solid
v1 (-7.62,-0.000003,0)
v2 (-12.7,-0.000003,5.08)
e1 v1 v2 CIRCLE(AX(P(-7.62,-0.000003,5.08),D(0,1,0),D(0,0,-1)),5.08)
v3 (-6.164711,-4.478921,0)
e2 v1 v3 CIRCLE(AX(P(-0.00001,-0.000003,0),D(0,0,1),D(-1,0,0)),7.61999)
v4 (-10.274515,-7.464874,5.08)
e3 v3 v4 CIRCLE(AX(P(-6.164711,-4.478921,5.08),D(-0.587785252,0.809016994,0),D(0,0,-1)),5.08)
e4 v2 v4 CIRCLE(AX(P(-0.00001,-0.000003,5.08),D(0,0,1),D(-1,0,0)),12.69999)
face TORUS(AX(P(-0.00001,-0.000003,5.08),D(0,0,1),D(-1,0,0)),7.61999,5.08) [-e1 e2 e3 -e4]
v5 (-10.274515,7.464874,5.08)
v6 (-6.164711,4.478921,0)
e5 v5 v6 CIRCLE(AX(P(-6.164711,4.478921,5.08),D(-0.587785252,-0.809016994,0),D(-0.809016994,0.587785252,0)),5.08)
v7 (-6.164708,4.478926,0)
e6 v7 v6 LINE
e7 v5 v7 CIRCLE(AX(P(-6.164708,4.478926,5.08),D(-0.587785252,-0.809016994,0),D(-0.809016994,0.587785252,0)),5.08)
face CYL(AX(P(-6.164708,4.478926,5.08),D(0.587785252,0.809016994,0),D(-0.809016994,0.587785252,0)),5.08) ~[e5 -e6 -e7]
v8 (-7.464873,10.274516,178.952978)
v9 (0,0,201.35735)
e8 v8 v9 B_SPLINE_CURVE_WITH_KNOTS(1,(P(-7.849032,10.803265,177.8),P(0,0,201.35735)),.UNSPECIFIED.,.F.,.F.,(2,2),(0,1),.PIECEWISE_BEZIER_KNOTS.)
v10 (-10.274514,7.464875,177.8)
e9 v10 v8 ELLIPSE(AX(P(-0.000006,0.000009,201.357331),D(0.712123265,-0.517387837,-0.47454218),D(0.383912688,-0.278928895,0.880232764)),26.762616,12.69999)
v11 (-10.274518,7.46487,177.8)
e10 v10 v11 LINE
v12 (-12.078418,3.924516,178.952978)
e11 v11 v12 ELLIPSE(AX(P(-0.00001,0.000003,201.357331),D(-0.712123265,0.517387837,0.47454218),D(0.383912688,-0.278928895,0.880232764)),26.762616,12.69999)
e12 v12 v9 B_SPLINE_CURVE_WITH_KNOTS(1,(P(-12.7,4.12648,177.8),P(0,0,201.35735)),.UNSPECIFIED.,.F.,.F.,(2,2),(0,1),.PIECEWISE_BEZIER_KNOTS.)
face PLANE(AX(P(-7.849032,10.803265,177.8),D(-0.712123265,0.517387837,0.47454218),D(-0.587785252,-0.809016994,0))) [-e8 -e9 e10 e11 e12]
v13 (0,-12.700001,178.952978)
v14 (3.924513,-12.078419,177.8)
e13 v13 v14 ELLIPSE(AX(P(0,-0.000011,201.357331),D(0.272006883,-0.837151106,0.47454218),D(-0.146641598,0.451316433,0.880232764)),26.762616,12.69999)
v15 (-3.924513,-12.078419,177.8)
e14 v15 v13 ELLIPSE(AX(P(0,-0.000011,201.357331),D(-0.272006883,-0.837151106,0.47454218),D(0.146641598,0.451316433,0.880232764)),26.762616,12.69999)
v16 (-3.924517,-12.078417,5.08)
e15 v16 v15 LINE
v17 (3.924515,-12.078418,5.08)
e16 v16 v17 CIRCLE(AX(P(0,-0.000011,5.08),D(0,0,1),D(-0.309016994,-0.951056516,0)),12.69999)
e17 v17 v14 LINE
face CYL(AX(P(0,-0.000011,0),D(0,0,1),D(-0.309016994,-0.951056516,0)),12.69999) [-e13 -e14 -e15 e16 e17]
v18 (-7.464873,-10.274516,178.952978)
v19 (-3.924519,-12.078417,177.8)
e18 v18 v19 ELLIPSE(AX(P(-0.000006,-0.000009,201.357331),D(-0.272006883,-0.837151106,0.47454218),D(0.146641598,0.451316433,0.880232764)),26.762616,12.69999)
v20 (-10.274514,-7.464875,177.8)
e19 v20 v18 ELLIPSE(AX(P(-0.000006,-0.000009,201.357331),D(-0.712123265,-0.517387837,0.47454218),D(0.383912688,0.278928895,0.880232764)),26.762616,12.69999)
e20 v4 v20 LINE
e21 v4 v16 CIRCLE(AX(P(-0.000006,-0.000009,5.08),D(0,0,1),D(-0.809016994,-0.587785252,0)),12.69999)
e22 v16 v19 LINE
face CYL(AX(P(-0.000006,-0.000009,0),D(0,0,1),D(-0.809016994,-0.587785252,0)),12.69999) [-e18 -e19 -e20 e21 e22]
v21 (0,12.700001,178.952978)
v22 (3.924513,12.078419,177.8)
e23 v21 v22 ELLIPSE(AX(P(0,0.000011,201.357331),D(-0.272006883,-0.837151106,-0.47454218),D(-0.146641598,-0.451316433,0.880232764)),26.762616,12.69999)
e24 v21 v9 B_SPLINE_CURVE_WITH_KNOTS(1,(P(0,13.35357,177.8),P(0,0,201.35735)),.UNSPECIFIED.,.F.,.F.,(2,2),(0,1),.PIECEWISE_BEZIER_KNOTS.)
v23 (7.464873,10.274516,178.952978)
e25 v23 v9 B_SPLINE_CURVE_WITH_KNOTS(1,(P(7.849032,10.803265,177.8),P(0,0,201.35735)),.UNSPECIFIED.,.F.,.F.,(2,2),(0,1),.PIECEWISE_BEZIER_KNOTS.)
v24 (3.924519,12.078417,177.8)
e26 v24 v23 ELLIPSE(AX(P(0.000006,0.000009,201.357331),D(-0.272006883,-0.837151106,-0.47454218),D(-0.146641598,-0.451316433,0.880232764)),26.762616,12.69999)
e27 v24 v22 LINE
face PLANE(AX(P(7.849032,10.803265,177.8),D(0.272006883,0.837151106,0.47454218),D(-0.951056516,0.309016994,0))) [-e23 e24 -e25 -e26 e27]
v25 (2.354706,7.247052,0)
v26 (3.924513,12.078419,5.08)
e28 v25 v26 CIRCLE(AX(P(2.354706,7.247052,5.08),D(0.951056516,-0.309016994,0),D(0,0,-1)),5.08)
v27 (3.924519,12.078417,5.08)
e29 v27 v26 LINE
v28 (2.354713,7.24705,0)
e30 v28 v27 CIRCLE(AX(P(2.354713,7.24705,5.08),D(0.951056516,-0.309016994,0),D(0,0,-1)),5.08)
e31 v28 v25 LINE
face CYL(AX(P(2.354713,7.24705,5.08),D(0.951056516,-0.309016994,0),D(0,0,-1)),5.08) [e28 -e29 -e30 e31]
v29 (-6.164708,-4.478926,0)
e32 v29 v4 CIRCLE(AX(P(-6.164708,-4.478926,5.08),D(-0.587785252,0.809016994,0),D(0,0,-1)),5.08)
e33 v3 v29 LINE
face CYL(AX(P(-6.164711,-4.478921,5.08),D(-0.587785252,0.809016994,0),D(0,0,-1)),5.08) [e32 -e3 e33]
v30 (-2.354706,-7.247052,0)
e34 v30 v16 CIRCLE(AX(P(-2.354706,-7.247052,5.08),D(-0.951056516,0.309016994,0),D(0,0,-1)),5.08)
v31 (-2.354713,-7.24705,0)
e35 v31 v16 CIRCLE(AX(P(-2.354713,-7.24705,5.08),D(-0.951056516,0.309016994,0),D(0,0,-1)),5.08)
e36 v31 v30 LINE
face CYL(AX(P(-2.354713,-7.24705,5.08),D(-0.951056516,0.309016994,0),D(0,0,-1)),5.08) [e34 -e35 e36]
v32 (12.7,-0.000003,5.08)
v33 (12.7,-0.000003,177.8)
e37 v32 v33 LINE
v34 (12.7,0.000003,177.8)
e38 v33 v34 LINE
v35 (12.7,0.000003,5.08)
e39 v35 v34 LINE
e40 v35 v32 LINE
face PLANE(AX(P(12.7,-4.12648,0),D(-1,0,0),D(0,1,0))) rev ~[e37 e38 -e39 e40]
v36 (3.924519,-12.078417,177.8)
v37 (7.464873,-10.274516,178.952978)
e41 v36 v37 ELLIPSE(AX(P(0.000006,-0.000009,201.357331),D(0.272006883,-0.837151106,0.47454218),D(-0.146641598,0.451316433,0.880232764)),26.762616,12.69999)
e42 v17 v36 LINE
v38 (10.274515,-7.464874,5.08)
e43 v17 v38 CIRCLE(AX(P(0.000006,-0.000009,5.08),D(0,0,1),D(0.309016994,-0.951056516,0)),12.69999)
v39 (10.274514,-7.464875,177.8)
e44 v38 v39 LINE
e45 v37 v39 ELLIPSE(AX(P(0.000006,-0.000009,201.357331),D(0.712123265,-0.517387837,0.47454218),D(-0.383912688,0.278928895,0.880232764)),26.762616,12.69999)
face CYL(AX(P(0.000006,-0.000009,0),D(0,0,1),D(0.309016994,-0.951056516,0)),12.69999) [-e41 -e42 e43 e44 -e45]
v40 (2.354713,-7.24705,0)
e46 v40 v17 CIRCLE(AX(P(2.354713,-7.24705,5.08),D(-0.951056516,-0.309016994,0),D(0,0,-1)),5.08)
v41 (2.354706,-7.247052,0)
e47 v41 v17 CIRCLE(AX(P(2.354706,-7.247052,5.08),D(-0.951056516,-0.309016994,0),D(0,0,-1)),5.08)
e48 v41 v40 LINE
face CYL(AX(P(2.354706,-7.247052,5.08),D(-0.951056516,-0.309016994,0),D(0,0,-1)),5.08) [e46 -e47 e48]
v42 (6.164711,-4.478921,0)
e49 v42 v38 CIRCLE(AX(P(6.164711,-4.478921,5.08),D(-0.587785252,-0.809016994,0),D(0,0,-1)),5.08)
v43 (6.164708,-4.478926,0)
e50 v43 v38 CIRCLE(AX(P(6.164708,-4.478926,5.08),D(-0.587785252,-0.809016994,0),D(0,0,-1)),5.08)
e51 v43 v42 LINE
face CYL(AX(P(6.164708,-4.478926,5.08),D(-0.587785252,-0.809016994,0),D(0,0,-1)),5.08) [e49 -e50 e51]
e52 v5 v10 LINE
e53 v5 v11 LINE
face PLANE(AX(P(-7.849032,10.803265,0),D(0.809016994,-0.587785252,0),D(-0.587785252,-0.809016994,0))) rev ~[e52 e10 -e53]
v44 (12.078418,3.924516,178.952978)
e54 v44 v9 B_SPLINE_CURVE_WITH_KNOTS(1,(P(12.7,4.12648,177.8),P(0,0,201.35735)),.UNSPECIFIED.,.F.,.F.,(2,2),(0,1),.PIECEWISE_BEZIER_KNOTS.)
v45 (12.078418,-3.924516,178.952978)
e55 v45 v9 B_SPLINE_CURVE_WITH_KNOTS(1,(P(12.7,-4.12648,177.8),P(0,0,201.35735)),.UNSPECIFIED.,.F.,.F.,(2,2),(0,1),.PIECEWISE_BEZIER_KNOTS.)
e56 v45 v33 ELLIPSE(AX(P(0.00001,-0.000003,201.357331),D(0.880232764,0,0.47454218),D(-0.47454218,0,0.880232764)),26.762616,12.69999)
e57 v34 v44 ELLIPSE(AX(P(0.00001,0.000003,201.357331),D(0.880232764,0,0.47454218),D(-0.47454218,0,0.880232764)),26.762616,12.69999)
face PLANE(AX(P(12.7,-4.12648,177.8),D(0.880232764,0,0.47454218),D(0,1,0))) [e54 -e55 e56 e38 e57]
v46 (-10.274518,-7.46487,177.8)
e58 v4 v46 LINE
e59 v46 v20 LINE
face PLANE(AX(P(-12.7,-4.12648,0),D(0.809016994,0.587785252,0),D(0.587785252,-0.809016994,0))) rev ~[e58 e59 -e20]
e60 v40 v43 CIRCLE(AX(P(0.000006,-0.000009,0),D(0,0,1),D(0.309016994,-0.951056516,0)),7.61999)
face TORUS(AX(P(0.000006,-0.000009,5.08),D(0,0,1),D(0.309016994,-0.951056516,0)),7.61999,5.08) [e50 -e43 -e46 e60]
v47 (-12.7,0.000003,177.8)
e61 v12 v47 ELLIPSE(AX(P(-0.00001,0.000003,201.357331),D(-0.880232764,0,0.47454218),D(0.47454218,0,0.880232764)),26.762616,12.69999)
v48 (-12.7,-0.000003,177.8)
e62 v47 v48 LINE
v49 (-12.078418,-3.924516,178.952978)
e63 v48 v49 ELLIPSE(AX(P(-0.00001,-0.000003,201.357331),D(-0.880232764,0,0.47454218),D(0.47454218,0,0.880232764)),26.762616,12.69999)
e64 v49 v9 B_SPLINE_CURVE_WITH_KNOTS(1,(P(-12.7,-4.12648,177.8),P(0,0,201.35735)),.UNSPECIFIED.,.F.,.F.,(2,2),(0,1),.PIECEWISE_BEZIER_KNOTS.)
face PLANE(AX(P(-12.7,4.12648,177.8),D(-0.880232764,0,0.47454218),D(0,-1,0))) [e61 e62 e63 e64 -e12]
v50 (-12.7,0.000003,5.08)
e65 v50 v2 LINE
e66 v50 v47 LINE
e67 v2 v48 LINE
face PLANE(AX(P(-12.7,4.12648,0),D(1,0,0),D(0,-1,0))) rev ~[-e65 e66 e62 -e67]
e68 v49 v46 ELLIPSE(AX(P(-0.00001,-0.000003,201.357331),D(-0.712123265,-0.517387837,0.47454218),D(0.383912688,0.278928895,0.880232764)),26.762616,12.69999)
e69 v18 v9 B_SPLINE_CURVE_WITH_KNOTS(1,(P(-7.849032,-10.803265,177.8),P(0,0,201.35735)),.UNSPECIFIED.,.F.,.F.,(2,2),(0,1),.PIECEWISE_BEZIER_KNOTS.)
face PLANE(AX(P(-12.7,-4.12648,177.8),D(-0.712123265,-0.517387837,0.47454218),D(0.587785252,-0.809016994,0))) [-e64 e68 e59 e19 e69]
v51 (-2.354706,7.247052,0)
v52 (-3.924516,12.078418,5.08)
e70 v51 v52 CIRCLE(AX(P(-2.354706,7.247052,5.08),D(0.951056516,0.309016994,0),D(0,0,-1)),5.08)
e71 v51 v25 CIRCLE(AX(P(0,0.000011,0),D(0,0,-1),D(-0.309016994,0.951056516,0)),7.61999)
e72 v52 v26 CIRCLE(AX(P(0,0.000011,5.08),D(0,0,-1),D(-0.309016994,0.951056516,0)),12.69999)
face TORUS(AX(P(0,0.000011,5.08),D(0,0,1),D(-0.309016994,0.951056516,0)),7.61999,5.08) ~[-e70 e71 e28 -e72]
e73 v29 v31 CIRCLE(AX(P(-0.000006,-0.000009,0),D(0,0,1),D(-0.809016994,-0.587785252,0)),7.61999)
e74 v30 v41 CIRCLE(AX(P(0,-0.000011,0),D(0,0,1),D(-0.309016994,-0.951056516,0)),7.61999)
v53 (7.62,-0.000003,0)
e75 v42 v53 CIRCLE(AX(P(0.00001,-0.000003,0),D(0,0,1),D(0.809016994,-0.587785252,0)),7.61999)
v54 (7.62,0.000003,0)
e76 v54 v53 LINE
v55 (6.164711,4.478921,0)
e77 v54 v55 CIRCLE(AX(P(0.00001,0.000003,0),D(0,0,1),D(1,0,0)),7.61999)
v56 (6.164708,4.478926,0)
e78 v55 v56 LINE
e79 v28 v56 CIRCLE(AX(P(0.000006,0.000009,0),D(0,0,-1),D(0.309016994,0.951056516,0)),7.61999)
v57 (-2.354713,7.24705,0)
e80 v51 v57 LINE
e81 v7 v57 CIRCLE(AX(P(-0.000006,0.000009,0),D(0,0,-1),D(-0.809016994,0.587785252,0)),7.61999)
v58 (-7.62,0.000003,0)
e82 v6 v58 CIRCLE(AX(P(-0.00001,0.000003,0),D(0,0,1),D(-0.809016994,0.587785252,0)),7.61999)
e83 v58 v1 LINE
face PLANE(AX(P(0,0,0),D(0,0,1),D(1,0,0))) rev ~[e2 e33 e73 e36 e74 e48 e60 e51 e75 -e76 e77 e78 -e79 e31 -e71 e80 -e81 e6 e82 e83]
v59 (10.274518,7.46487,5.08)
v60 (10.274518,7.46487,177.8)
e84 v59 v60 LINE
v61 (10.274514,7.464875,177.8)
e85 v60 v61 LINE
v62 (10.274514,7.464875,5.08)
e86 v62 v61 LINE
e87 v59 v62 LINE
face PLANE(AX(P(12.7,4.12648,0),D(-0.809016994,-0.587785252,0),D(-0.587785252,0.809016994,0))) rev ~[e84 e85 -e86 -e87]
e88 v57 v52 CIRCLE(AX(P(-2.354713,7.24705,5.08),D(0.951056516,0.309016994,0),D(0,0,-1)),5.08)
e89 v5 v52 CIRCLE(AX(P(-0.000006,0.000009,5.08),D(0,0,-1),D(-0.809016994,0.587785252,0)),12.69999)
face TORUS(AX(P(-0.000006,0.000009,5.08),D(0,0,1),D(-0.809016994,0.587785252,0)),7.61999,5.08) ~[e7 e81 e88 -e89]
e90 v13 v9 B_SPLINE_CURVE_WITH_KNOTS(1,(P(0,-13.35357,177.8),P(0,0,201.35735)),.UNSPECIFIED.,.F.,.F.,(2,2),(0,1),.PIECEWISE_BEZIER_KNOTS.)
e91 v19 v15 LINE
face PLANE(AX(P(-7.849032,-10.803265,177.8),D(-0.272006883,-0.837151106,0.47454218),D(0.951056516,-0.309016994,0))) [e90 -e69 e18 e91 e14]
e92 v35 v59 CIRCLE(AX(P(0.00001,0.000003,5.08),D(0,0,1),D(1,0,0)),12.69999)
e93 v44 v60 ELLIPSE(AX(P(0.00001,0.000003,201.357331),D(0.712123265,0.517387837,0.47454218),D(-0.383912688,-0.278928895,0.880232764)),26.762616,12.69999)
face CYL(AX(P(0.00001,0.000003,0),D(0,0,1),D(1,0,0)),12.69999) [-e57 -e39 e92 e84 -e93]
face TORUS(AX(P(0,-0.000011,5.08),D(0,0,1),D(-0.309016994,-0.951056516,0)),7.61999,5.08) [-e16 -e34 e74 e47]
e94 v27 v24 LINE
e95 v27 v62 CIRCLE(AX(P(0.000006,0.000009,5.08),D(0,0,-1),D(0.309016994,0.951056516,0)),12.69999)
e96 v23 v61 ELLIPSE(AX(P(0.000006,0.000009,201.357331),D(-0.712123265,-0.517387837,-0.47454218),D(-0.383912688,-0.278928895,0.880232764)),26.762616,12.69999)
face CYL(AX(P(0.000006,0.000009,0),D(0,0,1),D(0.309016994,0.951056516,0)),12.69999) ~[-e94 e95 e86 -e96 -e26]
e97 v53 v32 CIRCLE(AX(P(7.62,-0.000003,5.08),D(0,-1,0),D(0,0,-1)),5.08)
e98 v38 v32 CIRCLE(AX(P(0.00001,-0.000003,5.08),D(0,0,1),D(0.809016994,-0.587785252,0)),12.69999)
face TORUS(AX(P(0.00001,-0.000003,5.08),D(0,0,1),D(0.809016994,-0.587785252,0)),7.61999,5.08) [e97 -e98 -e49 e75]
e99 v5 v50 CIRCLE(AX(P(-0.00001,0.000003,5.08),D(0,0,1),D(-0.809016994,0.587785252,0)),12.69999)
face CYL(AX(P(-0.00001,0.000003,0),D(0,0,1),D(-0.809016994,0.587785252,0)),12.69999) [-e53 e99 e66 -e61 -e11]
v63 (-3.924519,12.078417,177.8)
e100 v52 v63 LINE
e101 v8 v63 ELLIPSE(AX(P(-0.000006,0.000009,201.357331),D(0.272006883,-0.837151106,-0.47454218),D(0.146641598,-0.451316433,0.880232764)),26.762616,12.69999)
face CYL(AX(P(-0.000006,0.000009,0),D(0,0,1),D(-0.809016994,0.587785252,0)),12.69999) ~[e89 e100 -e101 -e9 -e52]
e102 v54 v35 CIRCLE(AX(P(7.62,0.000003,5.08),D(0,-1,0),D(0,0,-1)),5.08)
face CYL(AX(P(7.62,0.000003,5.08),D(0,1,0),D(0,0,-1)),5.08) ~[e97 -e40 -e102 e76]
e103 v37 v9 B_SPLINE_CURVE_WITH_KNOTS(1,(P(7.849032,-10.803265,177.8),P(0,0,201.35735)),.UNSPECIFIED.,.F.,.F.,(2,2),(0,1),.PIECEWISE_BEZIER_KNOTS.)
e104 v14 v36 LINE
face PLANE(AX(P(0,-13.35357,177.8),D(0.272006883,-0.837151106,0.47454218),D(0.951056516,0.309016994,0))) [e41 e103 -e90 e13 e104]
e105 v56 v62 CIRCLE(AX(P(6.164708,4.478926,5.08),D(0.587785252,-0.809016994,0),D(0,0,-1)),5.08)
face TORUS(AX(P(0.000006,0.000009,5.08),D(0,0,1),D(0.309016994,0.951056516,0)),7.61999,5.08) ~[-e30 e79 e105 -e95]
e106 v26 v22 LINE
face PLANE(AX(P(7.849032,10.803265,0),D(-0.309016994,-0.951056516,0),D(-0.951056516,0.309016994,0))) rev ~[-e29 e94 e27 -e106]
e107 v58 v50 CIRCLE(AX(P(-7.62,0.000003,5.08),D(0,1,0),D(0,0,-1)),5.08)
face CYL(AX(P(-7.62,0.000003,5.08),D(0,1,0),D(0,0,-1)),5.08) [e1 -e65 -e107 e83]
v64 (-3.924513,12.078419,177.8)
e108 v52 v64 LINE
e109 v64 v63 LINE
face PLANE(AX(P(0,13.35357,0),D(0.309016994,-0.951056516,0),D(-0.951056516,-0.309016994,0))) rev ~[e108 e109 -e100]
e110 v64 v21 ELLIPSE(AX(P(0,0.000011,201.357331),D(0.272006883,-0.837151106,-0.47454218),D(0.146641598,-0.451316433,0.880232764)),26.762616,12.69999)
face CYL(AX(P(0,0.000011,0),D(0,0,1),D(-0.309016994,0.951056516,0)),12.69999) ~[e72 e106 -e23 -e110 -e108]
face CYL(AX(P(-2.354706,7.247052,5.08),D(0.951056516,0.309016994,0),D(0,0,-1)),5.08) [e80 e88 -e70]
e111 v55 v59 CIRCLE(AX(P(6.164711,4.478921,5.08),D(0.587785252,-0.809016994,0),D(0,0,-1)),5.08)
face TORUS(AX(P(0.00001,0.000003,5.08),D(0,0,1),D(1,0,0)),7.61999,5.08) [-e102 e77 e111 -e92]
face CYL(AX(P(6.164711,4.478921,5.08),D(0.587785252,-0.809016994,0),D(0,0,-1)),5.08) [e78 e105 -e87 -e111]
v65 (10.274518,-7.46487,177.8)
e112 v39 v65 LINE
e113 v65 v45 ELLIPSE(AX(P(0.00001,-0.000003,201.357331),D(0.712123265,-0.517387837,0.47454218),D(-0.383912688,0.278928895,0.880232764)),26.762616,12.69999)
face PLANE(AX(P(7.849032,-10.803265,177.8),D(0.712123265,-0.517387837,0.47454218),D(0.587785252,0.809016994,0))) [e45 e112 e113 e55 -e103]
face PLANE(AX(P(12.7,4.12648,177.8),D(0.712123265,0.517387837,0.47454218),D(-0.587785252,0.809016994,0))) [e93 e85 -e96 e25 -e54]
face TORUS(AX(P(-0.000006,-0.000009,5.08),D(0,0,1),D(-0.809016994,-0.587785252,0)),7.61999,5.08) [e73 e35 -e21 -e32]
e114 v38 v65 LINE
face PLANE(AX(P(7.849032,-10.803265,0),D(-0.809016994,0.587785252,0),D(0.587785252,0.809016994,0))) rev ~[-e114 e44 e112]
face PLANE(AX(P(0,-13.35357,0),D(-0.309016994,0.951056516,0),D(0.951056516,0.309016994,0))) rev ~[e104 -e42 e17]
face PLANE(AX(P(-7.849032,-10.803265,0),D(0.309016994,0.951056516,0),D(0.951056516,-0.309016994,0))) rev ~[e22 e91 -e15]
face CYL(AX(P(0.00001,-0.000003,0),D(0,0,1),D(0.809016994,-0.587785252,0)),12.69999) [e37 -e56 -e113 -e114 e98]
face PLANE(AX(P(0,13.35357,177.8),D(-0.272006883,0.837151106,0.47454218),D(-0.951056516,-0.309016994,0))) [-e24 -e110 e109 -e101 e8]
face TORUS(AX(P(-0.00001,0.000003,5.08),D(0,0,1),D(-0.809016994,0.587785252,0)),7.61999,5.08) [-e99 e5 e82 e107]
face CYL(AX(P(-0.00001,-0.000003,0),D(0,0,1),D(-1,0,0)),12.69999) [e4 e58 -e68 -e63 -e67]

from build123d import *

# Parameters (mm, degrees)
F1_DEPTH     = 177.8
F4_R         = 12.69999
F5_T1_DEPTH  = 6.4984e-06
F5_T3_DEPTH  = 6.4984e-06
F5_T5_DEPTH  = 6.4984e-06
F5_T7_DEPTH  = 6.4984e-06
F5_T9_DEPTH  = 6.4984e-06
F5_T11_DEPTH = 6.4984e-06
F5_T13_DEPTH = 6.4984e-06
F5_T15_DEPTH = 6.4984e-06
F5_T17_DEPTH = 6.4984e-06
F5_T20_ANGLE = 36
F5_T22_ANGLE = 36
F5_T24_ANGLE = 36
F5_T26_ANGLE = 36
F5_T28_ANGLE = 36
F5_T30_ANGLE = 36
F5_T32_ANGLE = 36
F5_T34_ANGLE = 36
F5_T36_ANGLE = 36
F5_T38_ANGLE = 36


# Not quite as in the source:
# - a fillet or chamfer that OpenCascade refuses, or shapes differently, is made with other operations: its cross-section is extruded or revolved along the edge and cut away or added
# - a fillet or chamfer is up to 0.001 mm smaller than in the source, because OpenCascade refuses the exact size


with BuildPart() as f1:
    # F0 (on Top) → F1 (new body)
    with BuildSketch(Plane.XY):
        Polygon((-12.7, 4.1264801422), (-12.7, -4.1264801422), (-7.8490316571, -10.8032652661), (0, -13.3535702478), (7.8490316571, -10.8032652661), (12.7, -4.1264801422), (12.7, 4.1264801422), (7.8490316571, 10.8032652661), (0, 13.3535702478), (-7.8490316571, 10.8032652661), align=None)
    extrude(amount=F1_DEPTH)

    # F1_face (on face) → F3 section 0
    with BuildSketch(Plane.XY.offset(177.8), mode=Mode.PRIVATE) as f3_s0:
        Polygon((-7.8490316571, 10.8032652661), (-12.7, 4.1264801422), (-12.7, -4.1264801422), (-7.8490316571, -10.8032652661), (0, -13.3535702478), (7.8490316571, -10.8032652661), (12.7, -4.1264801422), (12.7, 4.1264801422), (7.8490316571, 10.8032652661), (0, 13.3535702478), align=None)
    loft([f3_s0.sketch, Vertex(0, 0, 201.3573497534)])

    # F4 (radius 12.7 in the source; OpenCascade refuses exactly that, so slightly less here)
    f4_edges = [f1.edges().sort_by_distance(p)[0] for p in [
        (0, -13.35357, 88.9),
        (-7.849032, -10.803265, 88.9),
        (-12.7, -4.12648, 88.9),
        (-12.7, 4.12648, 88.9),
        (-7.849032, 10.803265, 88.9),
        (0, 13.35357, 88.9),
        (7.849032, 10.803265, 88.9),
        (12.7, 4.12648, 88.9),
        (12.7, -4.12648, 88.9),
        (7.849032, -10.803265, 88.9),
    ]]
    fillet(f4_edges, radius=F4_R)

    # F5: fillet of radius 5.08 on 1 edges, made by hand

    # F5_s2 → F5_t1 (cut)
    with BuildSketch(Plane.XZ.offset(-3.2492e-06)):
        with BuildLine():
            ThreePointArc((-7.62, 0), (-11.2121024484, 1.4878975516), (-12.7, 5.08))
            Line((-12.7, 5.08), (-12.7, 0))
            Line((-12.7, 0), (-7.62, 0))
        make_face()
        with BuildLine():
            ThreePointArc((7.62, 0), (11.2121024484, 1.4878975516), (12.7, 5.08))
            Line((12.7, 5.08), (12.7, 0))
            Line((12.7, 0), (7.62, 0))
        make_face()
    extrude(amount=F5_T1_DEPTH, mode=Mode.SUBTRACT)

    # F5_s4 → F5_t3 (cut)
    with BuildSketch(Plane(origin=(-1.9098e-06, 2.6287e-06, 0), x_dir=(0, 0, 1), z_dir=(0.5877852523, -0.8090169944, 0))):
        with BuildLine():
            ThreePointArc((0, 7.62), (1.4878975516, 11.2121024484), (5.08, 12.7))
            Line((5.08, 12.7), (0, 12.7))
            Line((0, 12.7), (0, 7.62))
        make_face()
    extrude(amount=F5_T3_DEPTH, mode=Mode.SUBTRACT)

    # F5_s6 → F5_t5 (cut)
    with BuildSketch(Plane(origin=(-3.0902e-06, 1.0041e-06, 0), x_dir=(0, 0, 1), z_dir=(0.9510565163, -0.3090169944, 0))):
        with BuildLine():
            ThreePointArc((0, 7.62), (1.4878975516, 11.2121024484), (5.08, 12.7))
            Line((5.08, 12.7), (0, 12.7))
            Line((0, 12.7), (0, 7.62))
        make_face()
    extrude(amount=F5_T5_DEPTH, mode=Mode.SUBTRACT)

    # F5_s8 → F5_t7 (cut)
    with BuildSketch(Plane(origin=(-3.0902e-06, -1.0041e-06, 0), x_dir=(0, 0, 1), z_dir=(0.9510565163, 0.3090169944, 0))):
        with BuildLine():
            ThreePointArc((0, 7.62), (1.4878975516, 11.2121024484), (5.08, 12.7))
            Line((5.08, 12.7), (0, 12.7))
            Line((0, 12.7), (0, 7.62))
        make_face()
    extrude(amount=F5_T7_DEPTH, mode=Mode.SUBTRACT)

    # F5_s10 → F5_t9 (cut)
    with BuildSketch(Plane(origin=(-1.9098e-06, -2.6287e-06, 0), x_dir=(0, 0, 1), z_dir=(0.5877852523, 0.8090169944, 0))):
        with BuildLine():
            ThreePointArc((0, 7.62), (1.4878975516, 11.2121024484), (5.08, 12.7))
            Line((5.08, 12.7), (0, 12.7))
            Line((0, 12.7), (0, 7.62))
        make_face()
    extrude(amount=F5_T9_DEPTH, mode=Mode.SUBTRACT)

    # F5_s12 → F5_t11 (cut)
    with BuildSketch(Plane(origin=(1.9098e-06, -2.6287e-06, 0), x_dir=(0, 0, 1), z_dir=(-0.5877852523, 0.8090169944, 0))):
        with BuildLine():
            ThreePointArc((0, 7.62), (1.4878975516, 11.2121024484), (5.08, 12.7))
            Line((5.08, 12.7), (0, 12.7))
            Line((0, 12.7), (0, 7.62))
        make_face()
    extrude(amount=F5_T11_DEPTH, mode=Mode.SUBTRACT)

    # F5_s14 → F5_t13 (cut)
    with BuildSketch(Plane(origin=(3.0902e-06, -1.0041e-06, 0), x_dir=(0, 0, 1), z_dir=(-0.9510565163, 0.3090169944, 0))):
        with BuildLine():
            ThreePointArc((0, 7.62), (1.4878975516, 11.2121024484), (5.08, 12.7))
            Line((5.08, 12.7), (0, 12.7))
            Line((0, 12.7), (0, 7.62))
        make_face()
    extrude(amount=F5_T13_DEPTH, mode=Mode.SUBTRACT)

    # F5_s16 → F5_t15 (cut)
    with BuildSketch(Plane(origin=(3.0902e-06, 1.0041e-06, 0), x_dir=(0, 0, 1), z_dir=(-0.9510565163, -0.3090169944, 0))):
        with BuildLine():
            ThreePointArc((0, 7.62), (1.4878975516, 11.2121024484), (5.08, 12.7))
            Line((5.08, 12.7), (0, 12.7))
            Line((0, 12.7), (0, 7.62))
        make_face()
    extrude(amount=F5_T15_DEPTH, mode=Mode.SUBTRACT)

    # F5_s18 → F5_t17 (cut)
    with BuildSketch(Plane(origin=(1.9098e-06, 2.6287e-06, 0), x_dir=(0, 0, 1), z_dir=(-0.5877852523, -0.8090169944, 0))):
        with BuildLine():
            ThreePointArc((5.08, 12.7), (1.4878975516, 11.2121024484), (0, 7.62))
            Line((0, 7.62), (0, 12.7))
            Line((0, 12.7), (5.08, 12.7))
        make_face()
    extrude(amount=F5_T17_DEPTH, mode=Mode.SUBTRACT)

    # F5_s19 → F5_t20 (revolve, cut)
    with BuildSketch(Plane.XZ.offset(3.2492e-06)):
        with BuildLine():
            ThreePointArc((-7.62, 0), (-11.2121024484, 1.4878975516), (-12.7, 5.08))
            Line((-12.7, 5.08), (-12.7, 0))
            Line((-12.7, 0), (-7.62, 0))
        make_face()
    revolve(axis=Axis((-1e-05, -3.2492e-06, 0), (0, 0, 1)), revolution_arc=F5_T20_ANGLE, mode=Mode.SUBTRACT)

    # F5_s21 → F5_t22 (revolve, cut)
    with BuildSketch(Plane(origin=(1.9098e-06, -2.6287e-06, 0), x_dir=(0, 0, 1), z_dir=(-0.5877852523, 0.8090169944, 0))):
        with BuildLine():
            ThreePointArc((0, -7.62), (1.4878975516, -11.2121024484), (5.08, -12.7))
            Line((5.08, -12.7), (0, -12.7))
            Line((0, -12.7), (0, -7.62))
        make_face()
    revolve(axis=Axis((-6.1803e-06, -8.5065e-06, 0), (0, 0, 1)), revolution_arc=F5_T22_ANGLE, mode=Mode.SUBTRACT)

    # F5_s23 → F5_t24 (revolve, cut)
    with BuildSketch(Plane(origin=(3.0902e-06, -1.0041e-06, 0), x_dir=(0, 0, 1), z_dir=(-0.9510565163, 0.3090169944, 0))):
        with BuildLine():
            ThreePointArc((0, -7.62), (1.4878975516, -11.2121024484), (5.08, -12.7))
            Line((5.08, -12.7), (0, -12.7))
            Line((0, -12.7), (0, -7.62))
        make_face()
    revolve(axis=Axis((0, -1.05146e-05, 0), (0, 0, 1)), revolution_arc=F5_T24_ANGLE, mode=Mode.SUBTRACT)

    # F5_s25 → F5_t26 (revolve, cut)
    with BuildSketch(Plane(origin=(3.0902e-06, 1.0041e-06, 0), x_dir=(0, 0, 1), z_dir=(-0.9510565163, -0.3090169944, 0))):
        with BuildLine():
            ThreePointArc((0, -7.62), (1.4878975516, -11.2121024484), (5.08, -12.7))
            Line((5.08, -12.7), (0, -12.7))
            Line((0, -12.7), (0, -7.62))
        make_face()
    revolve(axis=Axis((6.1803e-06, -8.5065e-06, 0), (0, 0, 1)), revolution_arc=F5_T26_ANGLE, mode=Mode.SUBTRACT)

    # F5_s27 → F5_t28 (revolve, cut)
    with BuildSketch(Plane(origin=(1.9098e-06, 2.6287e-06, 0), x_dir=(0, 0, 1), z_dir=(-0.5877852523, -0.8090169944, 0))):
        with BuildLine():
            ThreePointArc((0, -7.62), (1.4878975516, -11.2121024484), (5.08, -12.7))
            Line((5.08, -12.7), (0, -12.7))
            Line((0, -12.7), (0, -7.62))
        make_face()
    revolve(axis=Axis((1e-05, -3.2492e-06, 0), (0, 0, 1)), revolution_arc=F5_T28_ANGLE, mode=Mode.SUBTRACT)

    # F5_s29 → F5_t30 (revolve, cut)
    with BuildSketch(Plane.XZ.offset(-3.2492e-06)):
        with BuildLine():
            ThreePointArc((7.62, 0), (11.2121024484, 1.4878975516), (12.7, 5.08))
            Line((12.7, 5.08), (12.7, 0))
            Line((12.7, 0), (7.62, 0))
        make_face()
    revolve(axis=Axis((1e-05, 3.2492e-06, 0), (0, 0, 1)), revolution_arc=F5_T30_ANGLE, mode=Mode.SUBTRACT)

    # F5_s31 → F5_t32 (revolve, cut)
    with BuildSketch(Plane(origin=(3.0902e-06, -1.0041e-06, 0), x_dir=(0, 0, 1), z_dir=(-0.9510565163, 0.3090169944, 0))):
        with BuildLine():
            ThreePointArc((0, 7.62), (1.4878975516, 11.2121024484), (5.08, 12.7))
            Line((5.08, 12.7), (0, 12.7))
            Line((0, 12.7), (0, 7.62))
        make_face()
    revolve(axis=Axis((6.1803e-06, 8.5065e-06, 0), (0, 0, -1)), revolution_arc=F5_T32_ANGLE, mode=Mode.SUBTRACT)

    # F5_s33 → F5_t34 (revolve, cut)
    with BuildSketch(Plane(origin=(3.0902e-06, 1.0041e-06, 0), x_dir=(0, 0, 1), z_dir=(-0.9510565163, -0.3090169944, 0))):
        with BuildLine():
            ThreePointArc((0, 7.62), (1.4878975516, 11.2121024484), (5.08, 12.7))
            Line((5.08, 12.7), (0, 12.7))
            Line((0, 12.7), (0, 7.62))
        make_face()
    revolve(axis=Axis((0, 1.05146e-05, 0), (0, 0, -1)), revolution_arc=F5_T34_ANGLE, mode=Mode.SUBTRACT)

    # F5_s35 → F5_t36 (revolve, cut)
    with BuildSketch(Plane(origin=(1.9098e-06, 2.6287e-06, 0), x_dir=(0, 0, 1), z_dir=(-0.5877852523, -0.8090169944, 0))):
        with BuildLine():
            ThreePointArc((0, 7.62), (1.4878975516, 11.2121024484), (5.08, 12.7))
            Line((5.08, 12.7), (0, 12.7))
            Line((0, 12.7), (0, 7.62))
        make_face()
    revolve(axis=Axis((-6.1803e-06, 8.5065e-06, 0), (0, 0, -1)), revolution_arc=F5_T36_ANGLE, mode=Mode.SUBTRACT)

    # F5_s37 → F5_t38 (revolve, cut)
    with BuildSketch(Plane(origin=(-1.9098e-06, -2.6287e-06, 0), x_dir=(0, 0, 1), z_dir=(0.5877852523, 0.8090169944, 0))):
        with BuildLine():
            ThreePointArc((0, -7.62), (1.4878975516, -11.2121024484), (5.08, -12.7))
            Line((5.08, -12.7), (0, -12.7))
            Line((0, -12.7), (0, -7.62))
        make_face()
    revolve(axis=Axis((-1e-05, 3.2492e-06, 0), (0, 0, 1)), revolution_arc=F5_T38_ANGLE, mode=Mode.SUBTRACT)


solid = f1.part
